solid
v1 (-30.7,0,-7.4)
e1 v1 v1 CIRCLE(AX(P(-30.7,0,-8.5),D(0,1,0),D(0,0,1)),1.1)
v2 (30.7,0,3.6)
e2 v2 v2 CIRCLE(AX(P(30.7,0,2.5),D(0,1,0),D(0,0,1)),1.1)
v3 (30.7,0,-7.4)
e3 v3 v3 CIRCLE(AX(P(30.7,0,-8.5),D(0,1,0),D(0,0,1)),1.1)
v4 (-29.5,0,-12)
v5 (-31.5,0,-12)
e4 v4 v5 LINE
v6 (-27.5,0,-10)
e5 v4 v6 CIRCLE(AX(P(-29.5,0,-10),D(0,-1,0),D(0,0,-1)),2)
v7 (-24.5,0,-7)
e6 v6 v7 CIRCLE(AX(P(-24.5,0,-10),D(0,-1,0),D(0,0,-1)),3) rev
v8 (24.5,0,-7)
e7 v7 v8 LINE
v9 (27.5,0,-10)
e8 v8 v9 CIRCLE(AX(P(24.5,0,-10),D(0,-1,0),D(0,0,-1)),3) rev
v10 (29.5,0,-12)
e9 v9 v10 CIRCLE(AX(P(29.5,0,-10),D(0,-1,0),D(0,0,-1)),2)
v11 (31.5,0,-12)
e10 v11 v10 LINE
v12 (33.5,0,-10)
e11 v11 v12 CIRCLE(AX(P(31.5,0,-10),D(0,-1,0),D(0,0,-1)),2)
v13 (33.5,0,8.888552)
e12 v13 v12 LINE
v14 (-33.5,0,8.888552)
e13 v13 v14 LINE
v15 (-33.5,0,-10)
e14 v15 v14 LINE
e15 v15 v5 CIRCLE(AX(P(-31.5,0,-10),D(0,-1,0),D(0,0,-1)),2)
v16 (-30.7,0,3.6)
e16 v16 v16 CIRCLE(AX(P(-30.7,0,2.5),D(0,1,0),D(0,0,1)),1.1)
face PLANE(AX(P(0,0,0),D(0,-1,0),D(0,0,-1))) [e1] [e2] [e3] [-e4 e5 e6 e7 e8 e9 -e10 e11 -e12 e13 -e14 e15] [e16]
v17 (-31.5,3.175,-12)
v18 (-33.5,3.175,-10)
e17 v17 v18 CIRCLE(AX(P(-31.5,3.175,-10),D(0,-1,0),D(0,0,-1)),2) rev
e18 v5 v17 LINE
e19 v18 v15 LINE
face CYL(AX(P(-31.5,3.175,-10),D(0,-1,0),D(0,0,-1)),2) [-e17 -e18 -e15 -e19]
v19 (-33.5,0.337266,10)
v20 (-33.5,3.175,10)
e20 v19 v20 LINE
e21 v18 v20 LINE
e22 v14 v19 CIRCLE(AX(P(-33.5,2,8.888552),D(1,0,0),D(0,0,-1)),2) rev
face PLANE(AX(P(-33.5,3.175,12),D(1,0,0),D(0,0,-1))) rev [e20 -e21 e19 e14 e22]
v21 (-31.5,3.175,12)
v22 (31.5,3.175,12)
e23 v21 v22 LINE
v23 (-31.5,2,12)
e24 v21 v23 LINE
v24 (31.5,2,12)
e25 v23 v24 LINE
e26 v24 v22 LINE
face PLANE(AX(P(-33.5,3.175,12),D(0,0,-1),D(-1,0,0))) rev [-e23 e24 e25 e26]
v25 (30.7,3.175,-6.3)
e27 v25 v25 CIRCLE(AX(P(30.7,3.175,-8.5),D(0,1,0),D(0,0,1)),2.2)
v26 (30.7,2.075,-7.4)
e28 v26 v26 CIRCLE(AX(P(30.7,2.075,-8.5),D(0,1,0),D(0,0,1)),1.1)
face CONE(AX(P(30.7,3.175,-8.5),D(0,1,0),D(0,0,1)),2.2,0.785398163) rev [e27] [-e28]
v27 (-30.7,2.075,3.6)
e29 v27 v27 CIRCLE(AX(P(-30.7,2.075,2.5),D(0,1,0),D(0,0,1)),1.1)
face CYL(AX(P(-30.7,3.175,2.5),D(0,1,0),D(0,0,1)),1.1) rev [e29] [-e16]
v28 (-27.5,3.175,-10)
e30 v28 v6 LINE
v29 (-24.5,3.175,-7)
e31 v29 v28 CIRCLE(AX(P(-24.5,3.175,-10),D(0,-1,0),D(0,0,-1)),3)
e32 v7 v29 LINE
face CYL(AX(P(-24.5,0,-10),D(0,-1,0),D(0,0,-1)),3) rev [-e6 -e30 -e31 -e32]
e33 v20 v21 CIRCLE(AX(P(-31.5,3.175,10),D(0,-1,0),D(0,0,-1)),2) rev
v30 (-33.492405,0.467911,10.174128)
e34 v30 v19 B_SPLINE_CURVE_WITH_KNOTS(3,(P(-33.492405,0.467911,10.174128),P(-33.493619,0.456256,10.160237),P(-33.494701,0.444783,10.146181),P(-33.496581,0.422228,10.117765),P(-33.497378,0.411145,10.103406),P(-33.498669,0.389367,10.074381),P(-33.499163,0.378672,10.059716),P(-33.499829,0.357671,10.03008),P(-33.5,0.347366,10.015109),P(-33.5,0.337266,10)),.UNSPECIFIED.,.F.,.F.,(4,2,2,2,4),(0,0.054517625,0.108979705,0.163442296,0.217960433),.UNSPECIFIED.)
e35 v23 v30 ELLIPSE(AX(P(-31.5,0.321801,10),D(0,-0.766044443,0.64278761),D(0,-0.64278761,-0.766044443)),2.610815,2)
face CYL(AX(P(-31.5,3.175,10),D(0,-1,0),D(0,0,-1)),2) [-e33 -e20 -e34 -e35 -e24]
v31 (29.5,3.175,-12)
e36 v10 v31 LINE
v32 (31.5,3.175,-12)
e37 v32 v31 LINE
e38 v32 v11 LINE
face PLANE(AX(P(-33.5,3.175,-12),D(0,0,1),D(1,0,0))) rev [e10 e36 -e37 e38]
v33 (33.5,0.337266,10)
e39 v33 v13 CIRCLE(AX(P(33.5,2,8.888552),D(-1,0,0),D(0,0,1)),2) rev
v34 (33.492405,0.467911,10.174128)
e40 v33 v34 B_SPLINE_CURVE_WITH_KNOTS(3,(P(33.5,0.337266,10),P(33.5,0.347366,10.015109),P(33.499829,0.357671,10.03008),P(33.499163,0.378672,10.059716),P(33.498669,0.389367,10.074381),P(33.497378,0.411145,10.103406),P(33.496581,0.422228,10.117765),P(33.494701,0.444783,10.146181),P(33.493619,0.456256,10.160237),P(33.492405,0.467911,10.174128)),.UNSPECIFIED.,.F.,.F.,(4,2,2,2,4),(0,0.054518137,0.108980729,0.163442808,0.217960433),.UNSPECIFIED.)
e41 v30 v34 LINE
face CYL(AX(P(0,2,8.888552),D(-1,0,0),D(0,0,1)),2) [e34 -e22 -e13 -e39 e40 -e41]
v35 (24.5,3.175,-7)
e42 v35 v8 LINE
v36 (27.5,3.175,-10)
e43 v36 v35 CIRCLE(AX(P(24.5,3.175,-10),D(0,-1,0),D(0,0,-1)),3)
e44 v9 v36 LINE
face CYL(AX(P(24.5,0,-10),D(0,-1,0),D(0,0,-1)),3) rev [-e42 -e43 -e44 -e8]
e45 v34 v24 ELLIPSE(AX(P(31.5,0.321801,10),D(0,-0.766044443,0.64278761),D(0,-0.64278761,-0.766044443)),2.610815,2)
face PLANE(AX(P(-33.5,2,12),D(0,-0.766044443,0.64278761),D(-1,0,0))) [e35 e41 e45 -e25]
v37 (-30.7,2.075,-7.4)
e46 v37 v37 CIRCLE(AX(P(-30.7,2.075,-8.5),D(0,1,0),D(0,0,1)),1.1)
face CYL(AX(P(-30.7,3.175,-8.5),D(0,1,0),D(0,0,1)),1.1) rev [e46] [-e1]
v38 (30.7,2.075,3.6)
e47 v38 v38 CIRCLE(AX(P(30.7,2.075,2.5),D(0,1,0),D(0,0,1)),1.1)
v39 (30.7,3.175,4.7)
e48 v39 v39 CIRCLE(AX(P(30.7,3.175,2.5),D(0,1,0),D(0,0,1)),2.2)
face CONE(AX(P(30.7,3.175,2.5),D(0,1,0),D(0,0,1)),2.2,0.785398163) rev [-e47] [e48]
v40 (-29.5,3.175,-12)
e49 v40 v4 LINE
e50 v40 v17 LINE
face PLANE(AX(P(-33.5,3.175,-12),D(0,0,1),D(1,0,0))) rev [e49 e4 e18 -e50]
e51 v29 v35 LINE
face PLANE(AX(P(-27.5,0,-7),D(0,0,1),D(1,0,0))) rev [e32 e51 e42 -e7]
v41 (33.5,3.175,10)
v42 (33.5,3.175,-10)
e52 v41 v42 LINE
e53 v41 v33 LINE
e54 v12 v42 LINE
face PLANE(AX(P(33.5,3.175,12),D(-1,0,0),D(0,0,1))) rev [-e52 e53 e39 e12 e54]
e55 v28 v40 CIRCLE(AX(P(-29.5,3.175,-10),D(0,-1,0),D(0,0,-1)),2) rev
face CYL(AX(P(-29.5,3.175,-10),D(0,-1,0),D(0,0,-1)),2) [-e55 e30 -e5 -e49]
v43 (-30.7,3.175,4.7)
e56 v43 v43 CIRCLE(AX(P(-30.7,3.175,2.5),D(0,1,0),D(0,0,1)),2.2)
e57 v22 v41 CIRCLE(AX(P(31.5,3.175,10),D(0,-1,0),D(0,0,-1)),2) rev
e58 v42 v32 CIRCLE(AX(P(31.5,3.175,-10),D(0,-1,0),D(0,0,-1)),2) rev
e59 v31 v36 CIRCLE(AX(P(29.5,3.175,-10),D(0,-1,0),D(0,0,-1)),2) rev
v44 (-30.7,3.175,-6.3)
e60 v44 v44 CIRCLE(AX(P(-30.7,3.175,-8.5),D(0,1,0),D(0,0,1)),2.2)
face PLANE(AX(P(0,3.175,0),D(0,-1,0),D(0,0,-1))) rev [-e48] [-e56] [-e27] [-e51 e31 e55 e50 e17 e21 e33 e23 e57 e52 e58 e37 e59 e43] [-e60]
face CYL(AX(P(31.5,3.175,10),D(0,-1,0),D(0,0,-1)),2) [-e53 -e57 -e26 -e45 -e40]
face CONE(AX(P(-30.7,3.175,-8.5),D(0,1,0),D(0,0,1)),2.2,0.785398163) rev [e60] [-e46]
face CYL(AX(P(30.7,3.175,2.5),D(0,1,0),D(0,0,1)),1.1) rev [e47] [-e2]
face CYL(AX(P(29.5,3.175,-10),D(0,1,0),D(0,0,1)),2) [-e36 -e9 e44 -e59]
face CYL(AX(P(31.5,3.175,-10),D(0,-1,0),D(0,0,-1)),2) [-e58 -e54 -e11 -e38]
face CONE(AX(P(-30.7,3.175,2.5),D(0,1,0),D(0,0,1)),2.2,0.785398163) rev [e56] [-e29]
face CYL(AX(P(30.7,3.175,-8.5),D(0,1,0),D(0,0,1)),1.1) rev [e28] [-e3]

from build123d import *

# Parameters (mm, degrees)
SKETCH1_W                                       = 67
SKETCH1_H                                       = 24
BOSS_EXTRUDE1_DEPTH                             = 3.175
CSK_FOR_M2_FLAT_HEAD_MACHINE_SCREW1_D           = 2.2
CSK_FOR_M2_FLAT_HEAD_MACHINE_SCREW1_CSINK_D     = 4.4
CSK_FOR_M2_FLAT_HEAD_MACHINE_SCREW1_CSINK_ANGLE = 90
CHAMFER1_SIZE                                   = 2
CHAMFER1_SIZE2                                  = 2.383507185
SKETCH4_W                                       = 55
SKETCH4_H                                       = 10
CUT_EXTRUDE1_DEPTH                              = 36.725769761
FILLET2_R                                       = 2
FILLET4_R                                       = 3
FILLET5_R                                       = 2


with BuildPart() as part:
    # Sketch1 → Boss-Extrude1 (new body)
    with BuildSketch(Plane(origin=(0, 0, 0), x_dir=(1, 0, 0), z_dir=(0, 1, 0))):
        Rectangle(SKETCH1_W, SKETCH1_H)
    extrude(amount=BOSS_EXTRUDE1_DEPTH)

    # CSK for M2 Flat Head Machine Screw1 (through all)
    with Locations(Plane(origin=(0, 3.175, 0), x_dir=(1, 0, 0), z_dir=(0, 1, 0))):
        with Locations((-30.7, 8.5), (-30.7, -2.5), (30.7, -2.5), (30.7, 8.5)):
            CounterSinkHole(CSK_FOR_M2_FLAT_HEAD_MACHINE_SCREW1_D / 2, CSK_FOR_M2_FLAT_HEAD_MACHINE_SCREW1_CSINK_D / 2, counter_sink_angle=CSK_FOR_M2_FLAT_HEAD_MACHINE_SCREW1_CSINK_ANGLE)

    # Chamfer1
    chamfer1_edges = [part.edges().sort_by_distance(p)[0] for p in [
        (0, 0, 12),
    ]]
    chamfer1_side = [part.faces().sort_by_distance(p)[0] for p in [
        (0, 1.5875, 12),
    ]]
    chamfer(chamfer1_edges, length=CHAMFER1_SIZE, length2=CHAMFER1_SIZE2, reference=chamfer1_side[0])

    # Sketch4 → Cut-Extrude1 (cut, through all)
    with BuildSketch(Plane(origin=(0, 3.175, 0), x_dir=(1, 0, 0), z_dir=(0, 1, 0))):
        with Locations((0, 12)):
            Rectangle(SKETCH4_W, SKETCH4_H)
    extrude(amount=-CUT_EXTRUDE1_DEPTH, mode=Mode.SUBTRACT)

    # Fillet2
    fillet2_edges = [part.edges().sort_by_distance(p)[0] for p in [
        (0, 0, 9.616492815),
    ]]
    fillet(fillet2_edges, radius=FILLET2_R)

    # Fillet4
    fillet4_edges = [part.edges().sort_by_distance(p)[0] for p in [
        (-27.5, 1.5875, -7),
        (27.5, 1.5875, -7),
    ]]
    fillet(fillet4_edges, radius=FILLET4_R)

    # Fillet5
    fillet5_edges = [part.edges().sort_by_distance(p)[0] for p in [
        (33.5, 1.5875, -12),
        (33.5, 2.5875, 12),
        (-33.5, 2.5875, 12),
        (-27.5, 1.5875, -12),
        (27.5, 1.5875, -12),
        (-33.5, 1.5875, -12),
    ]]
    fillet(fillet5_edges, radius=FILLET5_R - 0.0001)  # a hair under: the kernel refuses the full size


solid = part.part
